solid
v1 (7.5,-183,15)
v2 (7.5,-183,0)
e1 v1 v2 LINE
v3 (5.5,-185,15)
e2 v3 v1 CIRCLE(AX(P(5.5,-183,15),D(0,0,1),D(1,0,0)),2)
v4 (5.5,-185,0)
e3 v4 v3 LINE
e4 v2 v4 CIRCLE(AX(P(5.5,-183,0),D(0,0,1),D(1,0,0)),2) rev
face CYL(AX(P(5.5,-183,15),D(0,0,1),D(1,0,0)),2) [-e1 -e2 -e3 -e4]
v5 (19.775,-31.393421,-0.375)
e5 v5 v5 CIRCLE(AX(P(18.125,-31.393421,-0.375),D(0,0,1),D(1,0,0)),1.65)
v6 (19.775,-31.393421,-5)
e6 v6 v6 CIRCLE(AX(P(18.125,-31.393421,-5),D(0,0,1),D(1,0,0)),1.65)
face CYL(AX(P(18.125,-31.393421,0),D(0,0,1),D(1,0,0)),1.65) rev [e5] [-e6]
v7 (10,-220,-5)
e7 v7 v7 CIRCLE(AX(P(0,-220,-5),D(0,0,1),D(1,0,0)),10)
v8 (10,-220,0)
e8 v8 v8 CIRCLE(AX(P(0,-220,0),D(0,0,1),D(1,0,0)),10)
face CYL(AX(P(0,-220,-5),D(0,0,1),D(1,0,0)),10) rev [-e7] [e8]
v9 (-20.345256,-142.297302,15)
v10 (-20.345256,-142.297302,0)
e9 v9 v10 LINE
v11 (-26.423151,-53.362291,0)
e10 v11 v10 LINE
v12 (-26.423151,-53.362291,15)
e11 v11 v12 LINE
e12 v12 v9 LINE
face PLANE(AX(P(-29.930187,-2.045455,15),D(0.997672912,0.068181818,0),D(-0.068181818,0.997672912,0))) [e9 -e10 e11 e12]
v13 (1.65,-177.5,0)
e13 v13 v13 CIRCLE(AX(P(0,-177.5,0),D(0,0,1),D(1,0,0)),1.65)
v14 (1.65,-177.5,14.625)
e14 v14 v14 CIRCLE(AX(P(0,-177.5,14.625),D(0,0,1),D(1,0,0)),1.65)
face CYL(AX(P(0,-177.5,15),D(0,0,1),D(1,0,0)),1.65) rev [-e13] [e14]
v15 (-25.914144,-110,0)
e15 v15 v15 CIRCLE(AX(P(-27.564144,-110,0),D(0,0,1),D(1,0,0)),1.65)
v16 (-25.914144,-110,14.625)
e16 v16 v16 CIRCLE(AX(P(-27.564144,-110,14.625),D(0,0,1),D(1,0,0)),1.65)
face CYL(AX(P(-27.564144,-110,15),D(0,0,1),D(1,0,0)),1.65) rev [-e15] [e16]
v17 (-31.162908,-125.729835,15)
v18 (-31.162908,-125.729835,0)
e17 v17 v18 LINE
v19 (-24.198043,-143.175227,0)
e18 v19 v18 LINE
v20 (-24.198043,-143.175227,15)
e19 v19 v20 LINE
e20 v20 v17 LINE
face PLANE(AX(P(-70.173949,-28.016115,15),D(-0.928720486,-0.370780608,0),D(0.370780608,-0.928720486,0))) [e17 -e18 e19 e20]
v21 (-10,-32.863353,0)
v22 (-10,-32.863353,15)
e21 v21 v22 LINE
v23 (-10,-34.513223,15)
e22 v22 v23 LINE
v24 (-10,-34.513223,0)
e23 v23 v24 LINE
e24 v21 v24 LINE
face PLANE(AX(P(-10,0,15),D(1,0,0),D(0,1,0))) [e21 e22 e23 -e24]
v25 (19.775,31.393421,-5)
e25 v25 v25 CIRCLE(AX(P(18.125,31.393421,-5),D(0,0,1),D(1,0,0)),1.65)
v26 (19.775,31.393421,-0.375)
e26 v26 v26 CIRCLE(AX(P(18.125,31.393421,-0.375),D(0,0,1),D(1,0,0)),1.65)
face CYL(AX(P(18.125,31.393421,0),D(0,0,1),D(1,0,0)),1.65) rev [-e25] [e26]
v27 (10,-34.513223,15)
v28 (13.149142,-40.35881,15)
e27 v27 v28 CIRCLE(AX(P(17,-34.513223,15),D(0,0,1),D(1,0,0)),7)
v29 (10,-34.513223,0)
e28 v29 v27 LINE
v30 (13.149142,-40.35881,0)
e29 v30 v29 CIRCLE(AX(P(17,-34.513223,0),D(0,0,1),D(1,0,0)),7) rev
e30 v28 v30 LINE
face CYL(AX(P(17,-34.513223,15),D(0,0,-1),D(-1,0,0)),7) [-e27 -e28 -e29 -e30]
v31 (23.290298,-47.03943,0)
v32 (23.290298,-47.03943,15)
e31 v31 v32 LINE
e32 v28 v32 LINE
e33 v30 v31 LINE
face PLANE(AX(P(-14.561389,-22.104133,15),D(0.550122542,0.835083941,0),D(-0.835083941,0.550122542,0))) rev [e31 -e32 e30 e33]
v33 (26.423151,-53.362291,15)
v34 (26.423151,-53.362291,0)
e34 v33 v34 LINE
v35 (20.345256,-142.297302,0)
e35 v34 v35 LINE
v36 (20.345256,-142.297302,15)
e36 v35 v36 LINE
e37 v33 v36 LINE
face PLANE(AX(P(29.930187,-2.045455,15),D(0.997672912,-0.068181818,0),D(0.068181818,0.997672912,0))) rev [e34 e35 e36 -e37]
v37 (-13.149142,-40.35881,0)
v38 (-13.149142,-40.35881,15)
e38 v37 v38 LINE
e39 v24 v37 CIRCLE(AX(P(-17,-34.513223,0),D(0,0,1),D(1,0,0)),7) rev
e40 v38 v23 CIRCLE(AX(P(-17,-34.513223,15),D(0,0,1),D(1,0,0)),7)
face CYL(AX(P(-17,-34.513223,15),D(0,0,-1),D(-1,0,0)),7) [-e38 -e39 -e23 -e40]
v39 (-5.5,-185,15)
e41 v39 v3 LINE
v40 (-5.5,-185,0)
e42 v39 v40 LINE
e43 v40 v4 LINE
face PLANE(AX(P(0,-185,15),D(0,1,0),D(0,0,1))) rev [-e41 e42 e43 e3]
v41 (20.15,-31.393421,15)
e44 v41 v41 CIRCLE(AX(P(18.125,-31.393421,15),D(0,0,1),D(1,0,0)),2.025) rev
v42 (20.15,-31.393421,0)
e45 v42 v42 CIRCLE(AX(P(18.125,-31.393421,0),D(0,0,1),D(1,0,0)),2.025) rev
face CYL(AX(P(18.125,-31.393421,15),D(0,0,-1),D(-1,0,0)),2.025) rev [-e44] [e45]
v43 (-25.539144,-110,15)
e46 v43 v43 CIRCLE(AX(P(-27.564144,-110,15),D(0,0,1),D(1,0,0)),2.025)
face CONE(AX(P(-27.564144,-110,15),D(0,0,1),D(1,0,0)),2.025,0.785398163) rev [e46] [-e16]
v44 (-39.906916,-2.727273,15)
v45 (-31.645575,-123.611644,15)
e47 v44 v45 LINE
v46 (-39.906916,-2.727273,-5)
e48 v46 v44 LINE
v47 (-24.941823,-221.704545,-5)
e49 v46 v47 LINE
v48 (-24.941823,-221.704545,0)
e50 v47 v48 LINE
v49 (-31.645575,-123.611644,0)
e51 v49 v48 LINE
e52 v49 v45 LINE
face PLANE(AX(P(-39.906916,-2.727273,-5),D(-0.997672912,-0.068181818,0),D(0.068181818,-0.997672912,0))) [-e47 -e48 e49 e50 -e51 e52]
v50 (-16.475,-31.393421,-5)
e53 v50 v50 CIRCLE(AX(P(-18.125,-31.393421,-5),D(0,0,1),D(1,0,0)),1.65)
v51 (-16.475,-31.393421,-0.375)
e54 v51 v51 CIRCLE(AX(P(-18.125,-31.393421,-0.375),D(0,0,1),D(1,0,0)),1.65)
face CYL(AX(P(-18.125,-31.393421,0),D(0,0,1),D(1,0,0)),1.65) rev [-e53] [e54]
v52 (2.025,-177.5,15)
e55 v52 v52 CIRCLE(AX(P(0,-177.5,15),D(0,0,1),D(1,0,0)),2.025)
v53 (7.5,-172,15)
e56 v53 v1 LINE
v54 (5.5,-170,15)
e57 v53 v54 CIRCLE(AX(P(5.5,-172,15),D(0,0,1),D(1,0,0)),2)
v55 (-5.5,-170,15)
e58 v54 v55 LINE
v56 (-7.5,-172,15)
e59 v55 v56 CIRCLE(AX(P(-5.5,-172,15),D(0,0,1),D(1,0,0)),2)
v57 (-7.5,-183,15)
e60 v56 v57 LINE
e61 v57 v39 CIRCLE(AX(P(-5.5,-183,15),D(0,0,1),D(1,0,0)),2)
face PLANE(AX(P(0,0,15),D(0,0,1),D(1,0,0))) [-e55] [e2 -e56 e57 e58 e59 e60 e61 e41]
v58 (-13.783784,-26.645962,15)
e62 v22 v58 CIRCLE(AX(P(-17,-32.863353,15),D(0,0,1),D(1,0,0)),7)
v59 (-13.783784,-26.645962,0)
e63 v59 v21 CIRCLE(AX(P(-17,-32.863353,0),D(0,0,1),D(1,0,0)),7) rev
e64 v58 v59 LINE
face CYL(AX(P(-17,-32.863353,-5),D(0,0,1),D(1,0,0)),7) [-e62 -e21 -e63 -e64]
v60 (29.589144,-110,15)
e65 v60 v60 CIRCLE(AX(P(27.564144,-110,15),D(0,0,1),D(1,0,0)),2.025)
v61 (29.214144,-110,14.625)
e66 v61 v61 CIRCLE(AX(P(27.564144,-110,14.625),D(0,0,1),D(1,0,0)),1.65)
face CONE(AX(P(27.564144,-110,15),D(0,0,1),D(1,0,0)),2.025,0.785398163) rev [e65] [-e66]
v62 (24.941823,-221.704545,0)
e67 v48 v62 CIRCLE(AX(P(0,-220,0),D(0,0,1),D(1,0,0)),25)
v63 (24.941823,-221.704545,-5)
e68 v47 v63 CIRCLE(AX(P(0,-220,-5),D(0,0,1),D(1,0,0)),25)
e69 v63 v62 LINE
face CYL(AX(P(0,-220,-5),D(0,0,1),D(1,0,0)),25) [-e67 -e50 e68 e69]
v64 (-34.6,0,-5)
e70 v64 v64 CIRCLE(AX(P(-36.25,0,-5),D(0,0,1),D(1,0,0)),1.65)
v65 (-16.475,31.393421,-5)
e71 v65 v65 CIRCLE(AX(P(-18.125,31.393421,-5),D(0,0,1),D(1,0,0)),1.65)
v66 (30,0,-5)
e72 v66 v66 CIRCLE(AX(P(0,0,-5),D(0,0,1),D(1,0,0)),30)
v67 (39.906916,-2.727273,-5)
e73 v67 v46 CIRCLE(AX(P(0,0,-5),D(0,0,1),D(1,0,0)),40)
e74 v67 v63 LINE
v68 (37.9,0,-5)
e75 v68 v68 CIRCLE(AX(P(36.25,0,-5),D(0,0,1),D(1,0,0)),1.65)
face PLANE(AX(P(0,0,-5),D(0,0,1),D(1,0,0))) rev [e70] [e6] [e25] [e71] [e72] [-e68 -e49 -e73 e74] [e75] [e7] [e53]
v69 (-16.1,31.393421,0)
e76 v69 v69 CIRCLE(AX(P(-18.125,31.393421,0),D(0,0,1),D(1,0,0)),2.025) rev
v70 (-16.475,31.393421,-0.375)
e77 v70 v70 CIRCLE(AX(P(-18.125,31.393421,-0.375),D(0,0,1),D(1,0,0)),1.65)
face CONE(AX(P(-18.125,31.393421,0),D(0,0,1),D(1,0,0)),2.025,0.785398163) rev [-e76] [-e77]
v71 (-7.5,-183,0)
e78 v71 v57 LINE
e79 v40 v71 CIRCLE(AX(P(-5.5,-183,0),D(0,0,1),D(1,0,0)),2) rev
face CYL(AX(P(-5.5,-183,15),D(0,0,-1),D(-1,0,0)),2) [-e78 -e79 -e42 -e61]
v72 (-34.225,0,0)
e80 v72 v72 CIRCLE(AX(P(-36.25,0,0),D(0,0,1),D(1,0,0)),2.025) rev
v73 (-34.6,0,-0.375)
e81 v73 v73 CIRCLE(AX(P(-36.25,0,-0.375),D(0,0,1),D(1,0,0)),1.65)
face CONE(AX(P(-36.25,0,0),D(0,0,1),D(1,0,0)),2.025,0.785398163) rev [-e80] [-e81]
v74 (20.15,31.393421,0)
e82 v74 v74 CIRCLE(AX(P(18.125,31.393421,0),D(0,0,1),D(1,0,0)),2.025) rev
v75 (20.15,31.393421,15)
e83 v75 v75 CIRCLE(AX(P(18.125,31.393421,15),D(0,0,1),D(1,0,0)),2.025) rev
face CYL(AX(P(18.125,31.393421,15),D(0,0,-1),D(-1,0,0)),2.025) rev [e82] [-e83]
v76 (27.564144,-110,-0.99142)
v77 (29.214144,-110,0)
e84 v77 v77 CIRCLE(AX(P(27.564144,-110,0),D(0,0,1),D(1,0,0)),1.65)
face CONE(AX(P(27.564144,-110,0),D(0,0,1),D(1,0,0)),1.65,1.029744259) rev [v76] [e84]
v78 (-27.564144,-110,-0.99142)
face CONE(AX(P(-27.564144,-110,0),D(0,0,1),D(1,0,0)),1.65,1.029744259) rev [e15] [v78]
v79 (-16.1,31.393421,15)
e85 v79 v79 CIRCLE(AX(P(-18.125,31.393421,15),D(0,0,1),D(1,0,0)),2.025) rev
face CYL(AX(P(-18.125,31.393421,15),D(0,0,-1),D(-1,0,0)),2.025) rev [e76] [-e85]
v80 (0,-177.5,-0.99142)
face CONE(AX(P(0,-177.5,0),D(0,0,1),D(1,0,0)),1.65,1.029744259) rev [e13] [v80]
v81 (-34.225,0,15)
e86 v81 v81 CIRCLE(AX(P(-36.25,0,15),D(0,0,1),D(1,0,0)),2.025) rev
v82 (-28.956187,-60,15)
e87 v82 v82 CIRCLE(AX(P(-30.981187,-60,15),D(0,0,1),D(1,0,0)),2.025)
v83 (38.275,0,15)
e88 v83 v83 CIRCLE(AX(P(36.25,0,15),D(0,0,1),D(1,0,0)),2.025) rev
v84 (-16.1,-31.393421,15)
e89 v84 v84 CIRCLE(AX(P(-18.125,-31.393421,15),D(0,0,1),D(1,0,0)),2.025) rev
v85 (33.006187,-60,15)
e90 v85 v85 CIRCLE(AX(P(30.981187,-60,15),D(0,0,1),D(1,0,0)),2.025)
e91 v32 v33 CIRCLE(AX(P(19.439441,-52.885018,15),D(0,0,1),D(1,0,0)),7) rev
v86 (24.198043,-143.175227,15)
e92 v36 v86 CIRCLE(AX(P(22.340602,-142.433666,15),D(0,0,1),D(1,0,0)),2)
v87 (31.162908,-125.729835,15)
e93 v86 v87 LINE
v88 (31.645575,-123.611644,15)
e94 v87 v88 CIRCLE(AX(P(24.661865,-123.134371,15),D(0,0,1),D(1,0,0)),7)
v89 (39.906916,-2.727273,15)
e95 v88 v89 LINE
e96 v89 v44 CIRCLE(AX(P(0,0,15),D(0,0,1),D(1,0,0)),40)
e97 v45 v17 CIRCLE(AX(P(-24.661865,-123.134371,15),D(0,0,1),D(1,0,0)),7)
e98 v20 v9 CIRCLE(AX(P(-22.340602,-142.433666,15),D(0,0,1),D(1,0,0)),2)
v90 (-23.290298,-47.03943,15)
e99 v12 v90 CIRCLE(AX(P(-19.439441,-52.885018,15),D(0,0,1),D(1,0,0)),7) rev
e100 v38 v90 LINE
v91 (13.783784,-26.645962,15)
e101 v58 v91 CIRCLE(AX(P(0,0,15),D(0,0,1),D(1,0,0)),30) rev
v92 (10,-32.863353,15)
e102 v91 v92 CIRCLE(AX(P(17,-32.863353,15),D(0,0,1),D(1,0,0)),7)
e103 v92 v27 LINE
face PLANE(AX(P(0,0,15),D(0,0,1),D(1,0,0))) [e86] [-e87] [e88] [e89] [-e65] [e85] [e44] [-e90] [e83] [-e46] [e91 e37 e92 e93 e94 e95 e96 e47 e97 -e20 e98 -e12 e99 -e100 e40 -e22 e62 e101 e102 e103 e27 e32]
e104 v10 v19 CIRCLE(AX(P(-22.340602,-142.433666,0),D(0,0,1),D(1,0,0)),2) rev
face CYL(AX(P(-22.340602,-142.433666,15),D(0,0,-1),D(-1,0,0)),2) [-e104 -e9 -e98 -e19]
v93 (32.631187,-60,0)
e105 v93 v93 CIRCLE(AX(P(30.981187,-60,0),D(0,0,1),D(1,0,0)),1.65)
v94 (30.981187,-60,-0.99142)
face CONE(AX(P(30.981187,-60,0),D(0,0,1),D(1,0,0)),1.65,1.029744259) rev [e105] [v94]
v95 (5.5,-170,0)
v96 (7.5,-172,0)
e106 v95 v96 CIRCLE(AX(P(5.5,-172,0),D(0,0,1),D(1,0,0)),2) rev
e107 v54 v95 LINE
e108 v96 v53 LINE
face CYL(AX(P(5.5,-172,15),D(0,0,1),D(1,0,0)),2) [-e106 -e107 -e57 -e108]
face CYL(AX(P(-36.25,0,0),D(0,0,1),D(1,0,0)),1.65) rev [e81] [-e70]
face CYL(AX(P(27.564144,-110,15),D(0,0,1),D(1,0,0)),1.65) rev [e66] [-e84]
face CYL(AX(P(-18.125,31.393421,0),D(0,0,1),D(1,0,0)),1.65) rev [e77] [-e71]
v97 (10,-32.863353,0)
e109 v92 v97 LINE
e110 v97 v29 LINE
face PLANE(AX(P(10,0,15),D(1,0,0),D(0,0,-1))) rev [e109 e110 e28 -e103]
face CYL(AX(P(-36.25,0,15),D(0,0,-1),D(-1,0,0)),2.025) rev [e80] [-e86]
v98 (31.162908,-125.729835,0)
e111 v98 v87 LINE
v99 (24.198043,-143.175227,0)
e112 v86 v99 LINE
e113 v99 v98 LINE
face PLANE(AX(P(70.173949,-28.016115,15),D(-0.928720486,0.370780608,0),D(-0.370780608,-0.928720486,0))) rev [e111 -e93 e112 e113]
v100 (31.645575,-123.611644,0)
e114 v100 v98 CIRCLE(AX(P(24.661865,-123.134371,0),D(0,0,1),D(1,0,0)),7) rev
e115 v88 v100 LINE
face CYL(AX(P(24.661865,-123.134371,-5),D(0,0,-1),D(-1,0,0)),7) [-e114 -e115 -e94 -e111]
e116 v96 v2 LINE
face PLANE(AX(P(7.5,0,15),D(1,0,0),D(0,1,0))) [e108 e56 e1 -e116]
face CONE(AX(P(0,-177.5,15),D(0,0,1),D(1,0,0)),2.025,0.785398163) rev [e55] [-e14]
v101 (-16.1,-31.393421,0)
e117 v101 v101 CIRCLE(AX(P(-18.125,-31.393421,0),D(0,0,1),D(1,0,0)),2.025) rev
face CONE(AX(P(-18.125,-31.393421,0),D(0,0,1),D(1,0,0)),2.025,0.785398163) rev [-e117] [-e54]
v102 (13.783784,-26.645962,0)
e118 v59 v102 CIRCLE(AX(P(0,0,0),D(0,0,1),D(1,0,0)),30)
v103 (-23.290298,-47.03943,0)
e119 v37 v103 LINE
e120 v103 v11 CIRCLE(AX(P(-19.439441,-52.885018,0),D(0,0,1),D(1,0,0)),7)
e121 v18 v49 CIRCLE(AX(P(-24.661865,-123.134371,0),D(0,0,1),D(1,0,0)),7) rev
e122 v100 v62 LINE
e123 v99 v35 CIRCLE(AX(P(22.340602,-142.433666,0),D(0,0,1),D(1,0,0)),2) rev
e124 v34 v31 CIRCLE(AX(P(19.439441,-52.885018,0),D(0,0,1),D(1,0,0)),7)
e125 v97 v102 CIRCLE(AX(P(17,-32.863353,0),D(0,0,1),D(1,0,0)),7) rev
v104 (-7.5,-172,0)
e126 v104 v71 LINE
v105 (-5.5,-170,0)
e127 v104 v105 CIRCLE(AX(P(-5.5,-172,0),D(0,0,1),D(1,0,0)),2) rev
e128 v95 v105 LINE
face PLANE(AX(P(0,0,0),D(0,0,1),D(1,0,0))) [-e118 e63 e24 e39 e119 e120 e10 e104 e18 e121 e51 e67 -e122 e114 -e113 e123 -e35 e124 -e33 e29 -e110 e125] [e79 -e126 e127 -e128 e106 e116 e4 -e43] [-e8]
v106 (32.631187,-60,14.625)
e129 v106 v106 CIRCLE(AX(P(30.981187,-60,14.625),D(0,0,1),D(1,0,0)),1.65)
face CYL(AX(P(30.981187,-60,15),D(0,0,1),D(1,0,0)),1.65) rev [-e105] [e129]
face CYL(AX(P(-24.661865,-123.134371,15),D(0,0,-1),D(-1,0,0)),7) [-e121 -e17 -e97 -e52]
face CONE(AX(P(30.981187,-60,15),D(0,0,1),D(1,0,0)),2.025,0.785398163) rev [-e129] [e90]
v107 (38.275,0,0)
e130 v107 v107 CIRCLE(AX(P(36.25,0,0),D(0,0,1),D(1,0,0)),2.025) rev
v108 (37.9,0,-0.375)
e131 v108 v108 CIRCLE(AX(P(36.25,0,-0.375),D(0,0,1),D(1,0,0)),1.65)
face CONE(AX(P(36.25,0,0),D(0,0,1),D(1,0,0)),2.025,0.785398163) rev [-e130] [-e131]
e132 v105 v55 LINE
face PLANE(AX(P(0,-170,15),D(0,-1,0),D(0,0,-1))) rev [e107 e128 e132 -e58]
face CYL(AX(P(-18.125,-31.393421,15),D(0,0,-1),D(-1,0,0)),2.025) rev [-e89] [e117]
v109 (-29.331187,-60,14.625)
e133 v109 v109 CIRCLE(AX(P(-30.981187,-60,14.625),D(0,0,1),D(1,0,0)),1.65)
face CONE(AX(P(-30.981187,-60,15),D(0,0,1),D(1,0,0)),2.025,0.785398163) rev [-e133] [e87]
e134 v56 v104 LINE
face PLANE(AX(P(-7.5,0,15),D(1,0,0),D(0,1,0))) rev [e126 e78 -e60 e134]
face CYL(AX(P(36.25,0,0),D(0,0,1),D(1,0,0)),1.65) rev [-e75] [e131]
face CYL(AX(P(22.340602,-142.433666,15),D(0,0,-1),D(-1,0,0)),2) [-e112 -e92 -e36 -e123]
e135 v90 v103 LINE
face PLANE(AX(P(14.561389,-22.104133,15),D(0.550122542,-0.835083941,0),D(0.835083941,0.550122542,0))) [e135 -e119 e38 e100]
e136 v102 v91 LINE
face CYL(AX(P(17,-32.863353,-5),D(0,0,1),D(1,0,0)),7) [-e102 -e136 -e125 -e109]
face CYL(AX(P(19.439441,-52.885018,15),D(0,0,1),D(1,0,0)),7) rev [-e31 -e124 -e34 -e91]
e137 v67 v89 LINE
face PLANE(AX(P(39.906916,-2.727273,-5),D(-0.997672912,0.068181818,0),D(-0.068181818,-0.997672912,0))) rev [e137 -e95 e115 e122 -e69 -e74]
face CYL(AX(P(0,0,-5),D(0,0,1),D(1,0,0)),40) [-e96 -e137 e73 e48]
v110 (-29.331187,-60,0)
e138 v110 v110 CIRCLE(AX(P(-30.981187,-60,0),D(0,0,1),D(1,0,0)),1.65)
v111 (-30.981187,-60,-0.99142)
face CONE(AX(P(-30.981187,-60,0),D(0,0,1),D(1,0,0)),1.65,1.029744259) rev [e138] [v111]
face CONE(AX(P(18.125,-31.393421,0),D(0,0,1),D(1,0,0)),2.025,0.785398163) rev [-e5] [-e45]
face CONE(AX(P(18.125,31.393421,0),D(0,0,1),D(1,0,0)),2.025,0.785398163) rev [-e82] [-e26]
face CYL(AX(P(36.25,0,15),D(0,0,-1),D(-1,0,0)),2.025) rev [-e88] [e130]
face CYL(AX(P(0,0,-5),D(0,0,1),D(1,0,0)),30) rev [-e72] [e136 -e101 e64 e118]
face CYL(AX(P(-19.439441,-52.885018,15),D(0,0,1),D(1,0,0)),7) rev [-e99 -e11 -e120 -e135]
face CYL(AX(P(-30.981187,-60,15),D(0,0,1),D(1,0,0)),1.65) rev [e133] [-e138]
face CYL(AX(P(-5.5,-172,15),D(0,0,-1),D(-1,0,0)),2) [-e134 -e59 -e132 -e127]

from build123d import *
from build123d.topology import SkipClean

# Parameters (mm, degrees)
SKETCH1_R                       = 40
SKETCH1_R_2                     = 30
BOSS_EXTRUDE1_DEPTH             = 5
M4X0_7_TAPPED_HOLE1_D           = 3.3
M4X0_7_TAPPED_HOLE1_CSINK_D     = 4.05
M4X0_7_TAPPED_HOLE1_CSINK_ANGLE = 90
CIRPATTERN1_COUNT               = 6
SKETCH14_R                      = 10
BOSS_EXTRUDE5_DEPTH             = 5
BOSS_EXTRUDE7_START             = 15
SKETCH15_R                      = 2.025
SKETCH15_W                      = 15
SKETCH15_H                      = 15
BOSS_EXTRUDE7_DEPTH             = 15
M4X0_7_TAPPED_HOLE2_D           = 3.3
M4X0_7_TAPPED_HOLE2_DEPTH       = 15
M4X0_7_TAPPED_HOLE2_CSINK_D     = 4.05
M4X0_7_TAPPED_HOLE2_CSINK_ANGLE = 90
M4X0_7_TAPPED_HOLE2_TIP         = 0.991420021
FILLET1_R                       = 7
FILLET2_R                       = 2


with BuildPart() as part:
    # Sketch1 → Boss-Extrude1 (new body)
    with BuildSketch(Plane.XY):
        Circle(SKETCH1_R)
        Circle(SKETCH1_R_2, mode=Mode.SUBTRACT)
    extrude(amount=-BOSS_EXTRUDE1_DEPTH)

    # M4x0.7 Tapped Hole1 (through all)
    with Locations(Plane.XY):
        with Locations((36.25, 0)):
            m4x0_7_tapped_hole1 = CounterSinkHole(M4X0_7_TAPPED_HOLE1_D / 2, M4X0_7_TAPPED_HOLE1_CSINK_D / 2, counter_sink_angle=M4X0_7_TAPPED_HOLE1_CSINK_ANGLE)

    # CirPattern1: M4x0.7 Tapped Hole1 ×6 about axis
    cirpattern1_axis = Axis((0, 0, 0), (0, 0, 1))
    for i in range(1, CIRPATTERN1_COUNT):
        add(m4x0_7_tapped_hole1.rotate(cirpattern1_axis, i * 360 / CIRPATTERN1_COUNT), mode=Mode.SUBTRACT)

    # Sketch14 → Boss-Extrude5 (add)
    with BuildSketch(Plane.XY):
        with BuildLine():
            ThreePointArc((39.906916487, -2.727272727), (0, -40), (-39.906916487, -2.727272727))
            Line((-39.906916487, -2.727272727), (-24.941822804, -221.704545455))
            ThreePointArc((-24.941822804, -221.704545455), (0, -245), (24.941822804, -221.704545455))
            Line((24.941822804, -221.704545455), (39.906916487, -2.727272727))
        make_face()
        with Locations((0, -220)):
            Circle(SKETCH14_R, mode=Mode.SUBTRACT)
    extrude(amount=-BOSS_EXTRUDE5_DEPTH)

    # Sketch15 → Boss-Extrude7 (add)
    # profile 1 of 2: a face of its own
    with SkipClean():  # the faces are left unmerged after this step: merging them gives an invalid solid
        with BuildSketch(Plane.XY.offset(BOSS_EXTRUDE7_START)):
            with BuildLine():
                Line((-39.906916487, -2.727272727), (-31.570605203, -124.708648069))
                Line((-31.570605203, -124.708648069), (-19.477143205, -155))
                Line((-19.477143205, -155), (-26.701678828, -49.28672208))
                Line((-26.701678828, -49.28672208), (-10, -38.284271247))
                Line((-10, -38.284271247), (-10, -28.284271247))
                ThreePointArc((-10, -28.284271247), (0, 30), (10, -28.284271247))
                Line((10, -28.284271247), (10, -38.284271247))
                Line((10, -38.284271247), (26.701678828, -49.28672208))
                Line((26.701678828, -49.28672208), (19.477143205, -155))
                Line((19.477143205, -155), (31.570605203, -124.708648069))
                Line((31.570605203, -124.708648069), (39.906916487, -2.727272727))
                ThreePointArc((39.906916487, -2.727272727), (0, 40), (-39.906916487, -2.727272727))
            make_face()
            with Locations((-18.125, -31.393420887)):
                Circle(SKETCH15_R, mode=Mode.SUBTRACT)
            with Locations((-36.25, 0)):
                Circle(SKETCH15_R, mode=Mode.SUBTRACT)
            with Locations((-18.125, 31.393420887)):
                Circle(SKETCH15_R, mode=Mode.SUBTRACT)
            with Locations((36.25, 0)):
                Circle(SKETCH15_R, mode=Mode.SUBTRACT)
            with Locations((18.125, -31.393420887)):
                Circle(SKETCH15_R, mode=Mode.SUBTRACT)
            with Locations((18.125, 31.393420887)):
                Circle(SKETCH15_R, mode=Mode.SUBTRACT)
        # profile 2 of 2: a face of its own
        with BuildSketch(Plane.XY.offset(BOSS_EXTRUDE7_START)):
            with Locations((0, -177.5)):
                Rectangle(SKETCH15_W, SKETCH15_H)
        extrude(amount=-BOSS_EXTRUDE7_DEPTH)

    # M4x0.7 Tapped Hole2
    with Locations(Plane.XY.offset(15)):
        with Locations((0, -177.5), (-27.564144185, -110), (27.564144185, -110), (-30.981186852, -60), (30.981186852, -60)):
            CounterSinkHole(M4X0_7_TAPPED_HOLE2_D / 2, M4X0_7_TAPPED_HOLE2_CSINK_D / 2, depth=M4X0_7_TAPPED_HOLE2_DEPTH, counter_sink_angle=M4X0_7_TAPPED_HOLE2_CSINK_ANGLE)
            with Locations((0, 0, -(M4X0_7_TAPPED_HOLE2_DEPTH + M4X0_7_TAPPED_HOLE2_TIP / 2))):  # 118° drill point
                Cone(0, M4X0_7_TAPPED_HOLE2_D / 2, M4X0_7_TAPPED_HOLE2_TIP, mode=Mode.SUBTRACT)

    # Fillet1
    # the kernel refuses this fillet: 7 mm, written as the material it adds along each edge
    with BuildSketch(Plane(origin=(-26.701678828, -49.28672208, 15), x_dir=(0.8350839414170254, 0.5501225416099637, 0), z_dir=(0, 0, -1))) as fillet1_piece_1:
        with BuildLine():
            CenterArc((FILLET1_R * 0.583582124754, FILLET1_R), FILLET1_R, 209.465856716, 60.534143284)
            Line((-FILLET1_R * 0.287066858092, FILLET1_R * 0.508095183324), (0, 0))
            Line((0, 0), (FILLET1_R * 0.583582124754, 0))
        make_face()
    extrude(amount=15)
    with BuildSketch(Plane(origin=(26.701678828, -49.28672208, 15), x_dir=(-0.8350839414170222, 0.5501225416099685, 0), z_dir=(0, 0, -1))) as fillet1_piece_2:
        with BuildLine():
            CenterArc((FILLET1_R * 0.583582124754, -FILLET1_R), FILLET1_R, 90, 60.534143284)
            Line((-FILLET1_R * 0.287066858092, -FILLET1_R * 0.508095183324), (0, 0))
            Line((0, 0), (FILLET1_R * 0.583582124754, 0))
        make_face()
    extrude(amount=15)
    # the kernel refuses this fillet: 7 mm, written as the material it takes off along each edge
    with BuildSketch(Plane(origin=(-31.570605203, -124.708648069, 17.748908315), x_dir=(-0.06818181818181737, 0.9976729121658168, 0), z_dir=(0, 0, -1))) as fillet1_2_piece_1:
        with BuildLine():
            CenterArc((FILLET1_R * 0.157080475159, FILLET1_R), FILLET1_R, 252.145796046, 17.854203954)
            Line((-FILLET1_R * 0.149515442954, FILLET1_R * 0.048160232499), (0, 0))
            Line((0, 0), (FILLET1_R * 0.157080475159, 0))
        make_face()
    extrude(amount=17.748908315, mode=Mode.SUBTRACT)
    with BuildSketch(Plane(origin=(-10, -38.284271247, 24.427621741), x_dir=(0, 1, 0), z_dir=(0, 0, -1))) as fillet1_2_piece_2:
        with BuildLine():
            CenterArc((FILLET1_R * 0.538721242354, -FILLET1_R), FILLET1_R, 90, 56.624579759)
            Line((-FILLET1_R * 0.296362699063, -FILLET1_R * 0.44987745839), (0, 0))
            Line((0, 0), (FILLET1_R * 0.538721242354, 0))
        make_face()
    extrude(amount=24.427621741, mode=Mode.SUBTRACT)
    with BuildSketch(Plane(origin=(-10, -28.284271247, 26.447705507), x_dir=(-0.9176733218940842, 0.39733571986907557, 0), z_dir=(0, 0, -1))) as fillet1_2_piece_3:
        with BuildLine():
            CenterArc((4.60428033, -6.983451615), FILLET1_R, 93.940506137, 62.647767091)
            Line((-1.819432923, -4.202101576), (0, 0))
            ThreePointArc((0, 0), (2.061618058, -0.070921648), (4.123236116, 0))
        make_face()
    extrude(amount=26.447705507, mode=Mode.SUBTRACT)
    with BuildSketch(Plane(origin=(10, -28.284271247, 26.447705507), x_dir=(0, -1, 0), z_dir=(0, 0, -1))) as fillet1_2_piece_4:
        with BuildLine():
            CenterArc((4.579082203, -7), FILLET1_R, 90, 62.647767091)
            ThreePointArc((-1.63830899, -3.783783784), (-0.754071591, -1.920071596), (0, 0))
            Line((0, 0), (4.579082203, 0))
        make_face()
    extrude(amount=26.447705507, mode=Mode.SUBTRACT)
    with BuildSketch(Plane(origin=(10, -38.284271247, 24.427621741), x_dir=(0, 1, 0), z_dir=(0, 0, -1))) as fillet1_2_piece_5:
        with BuildLine():
            CenterArc((FILLET1_R * 0.538721242354, FILLET1_R), FILLET1_R, 213.375420241, 56.624579759)
            Line((-FILLET1_R * 0.296362699063, FILLET1_R * 0.44987745839), (0, 0))
            Line((0, 0), (FILLET1_R * 0.538721242354, 0))
        make_face()
    extrude(amount=24.427621741, mode=Mode.SUBTRACT)
    with BuildSketch(Plane(origin=(31.570605203, -124.708648069, 17.748908315), x_dir=(0.06818181818181737, 0.9976729121658168, 0), z_dir=(0, 0, -1))) as fillet1_2_piece_6:
        with BuildLine():
            CenterArc((FILLET1_R * 0.157080475159, -FILLET1_R), FILLET1_R, 90, 17.854203954)
            Line((-FILLET1_R * 0.149515442954, -FILLET1_R * 0.048160232499), (0, 0))
            Line((0, 0), (FILLET1_R * 0.157080475159, 0))
        make_face()
    extrude(amount=17.748908315, mode=Mode.SUBTRACT)

    # Fillet2
    fillet2_edges = [part.edges().sort_by_distance(p)[0] for p in [
        (7.5, -170, 7.5),
        (-7.5, -170, 7.5),
        (-7.5, -185, 7.5),
        (7.5, -185, 7.5),
        (-19.477143205, -155, 7.5),
        (19.477143205, -155, 7.5),
    ]]
    fillet(fillet2_edges, radius=FILLET2_R)


solid = part.part
